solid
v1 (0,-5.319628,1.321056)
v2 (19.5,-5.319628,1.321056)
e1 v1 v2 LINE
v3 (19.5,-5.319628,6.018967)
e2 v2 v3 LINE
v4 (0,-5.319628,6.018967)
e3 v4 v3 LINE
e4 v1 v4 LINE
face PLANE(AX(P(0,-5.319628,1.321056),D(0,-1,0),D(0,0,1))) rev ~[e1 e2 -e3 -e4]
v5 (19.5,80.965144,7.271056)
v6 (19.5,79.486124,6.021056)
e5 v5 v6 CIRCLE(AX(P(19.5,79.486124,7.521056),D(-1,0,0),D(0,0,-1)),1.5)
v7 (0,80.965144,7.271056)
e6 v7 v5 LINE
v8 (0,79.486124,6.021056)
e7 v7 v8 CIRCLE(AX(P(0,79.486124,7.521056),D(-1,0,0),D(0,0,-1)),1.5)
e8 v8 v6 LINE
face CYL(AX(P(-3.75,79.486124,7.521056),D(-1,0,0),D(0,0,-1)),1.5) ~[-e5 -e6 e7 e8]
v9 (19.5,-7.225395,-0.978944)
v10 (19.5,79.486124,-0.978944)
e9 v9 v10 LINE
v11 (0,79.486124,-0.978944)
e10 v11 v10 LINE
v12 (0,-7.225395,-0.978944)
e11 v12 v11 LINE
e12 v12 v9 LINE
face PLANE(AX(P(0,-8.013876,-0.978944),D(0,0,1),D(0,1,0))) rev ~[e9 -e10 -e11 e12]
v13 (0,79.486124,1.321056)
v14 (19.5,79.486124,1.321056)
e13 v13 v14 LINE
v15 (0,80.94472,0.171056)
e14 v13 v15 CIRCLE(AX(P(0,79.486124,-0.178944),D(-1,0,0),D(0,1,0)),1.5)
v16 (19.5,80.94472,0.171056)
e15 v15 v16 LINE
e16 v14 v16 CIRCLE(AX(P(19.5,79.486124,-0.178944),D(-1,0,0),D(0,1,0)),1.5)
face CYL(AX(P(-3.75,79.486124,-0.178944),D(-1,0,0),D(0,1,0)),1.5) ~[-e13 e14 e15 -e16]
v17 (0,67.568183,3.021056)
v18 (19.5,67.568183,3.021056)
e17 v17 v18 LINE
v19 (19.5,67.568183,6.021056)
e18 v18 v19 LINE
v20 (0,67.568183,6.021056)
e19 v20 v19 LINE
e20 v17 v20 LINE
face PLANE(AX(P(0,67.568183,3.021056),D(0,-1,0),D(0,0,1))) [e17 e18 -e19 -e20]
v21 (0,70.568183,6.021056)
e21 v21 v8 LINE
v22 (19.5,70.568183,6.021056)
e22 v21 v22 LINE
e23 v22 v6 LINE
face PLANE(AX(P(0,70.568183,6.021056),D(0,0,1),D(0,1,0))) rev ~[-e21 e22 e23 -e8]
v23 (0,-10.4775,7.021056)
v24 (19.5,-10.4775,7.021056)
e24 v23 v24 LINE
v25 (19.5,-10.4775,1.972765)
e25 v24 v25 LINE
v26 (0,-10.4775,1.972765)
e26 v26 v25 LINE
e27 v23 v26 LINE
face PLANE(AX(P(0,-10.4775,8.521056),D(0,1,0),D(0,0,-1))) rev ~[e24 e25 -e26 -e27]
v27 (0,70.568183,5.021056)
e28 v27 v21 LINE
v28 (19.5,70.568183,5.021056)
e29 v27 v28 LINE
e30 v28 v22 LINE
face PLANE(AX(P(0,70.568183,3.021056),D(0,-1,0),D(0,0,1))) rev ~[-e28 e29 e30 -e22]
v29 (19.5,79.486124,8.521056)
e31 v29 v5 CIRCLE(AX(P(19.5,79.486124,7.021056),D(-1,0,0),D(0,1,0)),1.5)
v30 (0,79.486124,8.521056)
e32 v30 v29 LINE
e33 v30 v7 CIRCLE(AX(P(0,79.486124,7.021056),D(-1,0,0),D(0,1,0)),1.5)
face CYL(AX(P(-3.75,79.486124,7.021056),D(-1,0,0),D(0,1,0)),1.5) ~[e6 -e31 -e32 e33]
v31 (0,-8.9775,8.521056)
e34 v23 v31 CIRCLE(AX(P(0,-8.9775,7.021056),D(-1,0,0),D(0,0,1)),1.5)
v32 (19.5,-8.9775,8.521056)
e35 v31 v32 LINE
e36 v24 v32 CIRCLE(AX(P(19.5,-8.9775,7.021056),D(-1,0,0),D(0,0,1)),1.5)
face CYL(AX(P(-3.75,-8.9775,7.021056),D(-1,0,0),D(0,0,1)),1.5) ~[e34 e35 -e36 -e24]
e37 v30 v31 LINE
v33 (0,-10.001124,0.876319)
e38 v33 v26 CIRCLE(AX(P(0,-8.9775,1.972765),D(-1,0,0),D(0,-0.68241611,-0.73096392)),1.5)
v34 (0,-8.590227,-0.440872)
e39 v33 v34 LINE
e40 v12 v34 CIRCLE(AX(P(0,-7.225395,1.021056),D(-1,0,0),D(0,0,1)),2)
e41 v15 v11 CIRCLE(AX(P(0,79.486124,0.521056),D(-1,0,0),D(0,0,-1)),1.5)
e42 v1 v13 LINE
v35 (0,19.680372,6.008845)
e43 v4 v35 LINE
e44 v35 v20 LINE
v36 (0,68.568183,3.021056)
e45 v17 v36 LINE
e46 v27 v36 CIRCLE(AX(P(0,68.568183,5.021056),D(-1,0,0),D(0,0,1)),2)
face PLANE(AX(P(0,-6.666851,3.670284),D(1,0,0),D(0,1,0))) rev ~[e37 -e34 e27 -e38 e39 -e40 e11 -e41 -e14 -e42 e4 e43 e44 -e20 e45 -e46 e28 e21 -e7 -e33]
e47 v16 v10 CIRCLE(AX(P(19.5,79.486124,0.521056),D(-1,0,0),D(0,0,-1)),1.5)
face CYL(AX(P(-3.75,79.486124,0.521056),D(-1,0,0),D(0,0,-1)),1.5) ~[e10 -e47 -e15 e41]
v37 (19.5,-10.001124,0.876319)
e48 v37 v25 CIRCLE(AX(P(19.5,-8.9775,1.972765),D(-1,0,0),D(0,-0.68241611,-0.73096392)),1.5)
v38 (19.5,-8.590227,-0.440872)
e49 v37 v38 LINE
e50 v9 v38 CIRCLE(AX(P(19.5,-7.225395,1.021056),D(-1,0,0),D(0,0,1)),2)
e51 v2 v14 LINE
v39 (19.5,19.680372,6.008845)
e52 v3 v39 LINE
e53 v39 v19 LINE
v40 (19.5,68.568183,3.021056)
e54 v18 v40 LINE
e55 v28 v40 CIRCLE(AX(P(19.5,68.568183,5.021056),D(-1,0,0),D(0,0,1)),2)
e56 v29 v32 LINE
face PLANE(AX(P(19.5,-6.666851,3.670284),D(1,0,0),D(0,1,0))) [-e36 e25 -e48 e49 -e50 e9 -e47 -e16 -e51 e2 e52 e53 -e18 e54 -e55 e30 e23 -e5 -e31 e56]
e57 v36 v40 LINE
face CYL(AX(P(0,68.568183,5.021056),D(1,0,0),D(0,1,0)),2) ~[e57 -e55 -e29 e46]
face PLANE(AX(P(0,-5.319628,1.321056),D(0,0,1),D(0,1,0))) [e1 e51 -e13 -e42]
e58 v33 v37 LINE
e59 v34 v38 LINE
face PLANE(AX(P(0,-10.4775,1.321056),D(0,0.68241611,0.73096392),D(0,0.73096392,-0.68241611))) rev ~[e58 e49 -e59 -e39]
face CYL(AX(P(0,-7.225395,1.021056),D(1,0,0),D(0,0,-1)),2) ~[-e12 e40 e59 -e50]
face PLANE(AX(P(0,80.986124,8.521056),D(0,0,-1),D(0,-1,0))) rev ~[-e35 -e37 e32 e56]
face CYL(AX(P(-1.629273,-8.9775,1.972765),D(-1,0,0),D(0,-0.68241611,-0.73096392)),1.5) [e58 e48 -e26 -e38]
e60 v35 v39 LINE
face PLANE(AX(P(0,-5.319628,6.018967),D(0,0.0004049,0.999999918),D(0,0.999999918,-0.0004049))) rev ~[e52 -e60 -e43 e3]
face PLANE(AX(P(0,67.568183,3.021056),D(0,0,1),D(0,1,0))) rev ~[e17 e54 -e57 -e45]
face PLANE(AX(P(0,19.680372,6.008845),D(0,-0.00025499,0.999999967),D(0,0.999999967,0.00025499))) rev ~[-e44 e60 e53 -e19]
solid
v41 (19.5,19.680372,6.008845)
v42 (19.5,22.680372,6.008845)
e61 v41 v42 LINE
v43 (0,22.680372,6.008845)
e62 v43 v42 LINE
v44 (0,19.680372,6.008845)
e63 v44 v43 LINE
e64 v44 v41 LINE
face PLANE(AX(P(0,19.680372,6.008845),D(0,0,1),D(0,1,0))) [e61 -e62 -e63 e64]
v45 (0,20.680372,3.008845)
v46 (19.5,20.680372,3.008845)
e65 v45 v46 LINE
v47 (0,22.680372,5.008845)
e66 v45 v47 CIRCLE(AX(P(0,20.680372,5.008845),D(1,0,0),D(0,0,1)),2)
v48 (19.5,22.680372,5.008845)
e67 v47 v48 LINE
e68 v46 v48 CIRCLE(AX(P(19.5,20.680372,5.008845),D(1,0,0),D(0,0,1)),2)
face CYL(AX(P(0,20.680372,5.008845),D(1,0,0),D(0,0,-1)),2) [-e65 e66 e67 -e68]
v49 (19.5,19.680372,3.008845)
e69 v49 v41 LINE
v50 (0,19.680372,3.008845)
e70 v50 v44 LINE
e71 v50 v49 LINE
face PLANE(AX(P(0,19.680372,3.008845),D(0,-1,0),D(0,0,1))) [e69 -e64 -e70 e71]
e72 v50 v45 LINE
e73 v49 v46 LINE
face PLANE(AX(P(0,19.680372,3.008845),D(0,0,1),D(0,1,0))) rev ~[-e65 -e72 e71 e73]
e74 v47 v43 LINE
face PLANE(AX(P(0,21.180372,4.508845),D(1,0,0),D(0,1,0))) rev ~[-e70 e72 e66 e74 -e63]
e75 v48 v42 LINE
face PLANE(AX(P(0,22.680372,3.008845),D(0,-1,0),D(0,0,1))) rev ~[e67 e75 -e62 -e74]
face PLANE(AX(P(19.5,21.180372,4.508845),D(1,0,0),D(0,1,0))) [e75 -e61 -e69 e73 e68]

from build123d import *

# Parameters (mm, degrees)
F0_W        = 2.6942476507
F0_H        = 2.3
F0_W_2      = 86.3057523493
F0_H_2      = 2.5
F0_W_3      = 3
F0_H_3      = 3
F1_DEPTH    = 19.5
F2_T1_DEPTH = 27
F2_T3_DEPTH = 22.7585454732
F3_R        = 2
F3_2_R      = 2


# Not quite as in the source:
# - a fillet or chamfer that OpenCascade refuses, or shapes differently, is made with other operations: its cross-section is extruded or revolved along the edge and cut away or added


with BuildPart() as f1:
    # F0 (on Right) → F1 (new body)
    with BuildSketch(Plane.YZ):
        Polygon((-8.0138755839, 6.0200582189), (-8.0138755839, 1.3210557405), (-5.3196279332, 1.3210557405), (-5.3196279332, 6.0189673179), align=None)
        with Locations((-6.6667517586, 0.1710557405)):
            Rectangle(F0_W, F0_H)
        Polygon((-8.0138755839, -0.9789442595), (-8.0138755839, 1.3210557405), (-8.0138755839, 6.0200582189), (-10.4775000364, 6.0210557405), (-10.4775000364, 1.3210557405), align=None)
        with Locations((37.8332482414, 0.1710557405)):
            Rectangle(F0_W_2, F0_H)
        Polygon((-10.4775000364, 6.0210557405), (-8.0138755839, 6.0200582189), (-8.0138755839, 6.0210557405), align=None)
        Polygon((-8.0138755839, 6.0210557405), (-8.0138755839, 6.0200582189), (-5.3196279332, 6.0189673179), (-5.3196279332, 6.0210557405), align=None)
        Polygon((-5.3196279332, 6.0210557405), (-5.3196279332, 6.0189673179), (19.6803720668, 6.0088448171), (19.6803689531, 6.0210557405), (-2.3196279332, 6.0210557405), align=None)
        Polygon((-10.4775000364, 6.0210557405), (-8.0138755839, 6.0210557405), (-8.0138755839, 8.5210557405), (-10.4775000364, 8.5210557405), (-10.4775000364, 6.8358753532), align=None)
        with Locations((-6.6667517586, 7.2710557405)):
            Rectangle(F0_W, F0_H_2)
        with Locations((-3.8196279332, 7.2710557405)):
            Rectangle(F0_W_3, F0_H_2)
        Polygon((19.6803689531, 6.0210557405), (19.6803720668, 6.0088448171), (67.5681829453, 6.0210557405), align=None)
        Polygon((-2.3196279332, 8.5210557405), (-2.3196279332, 6.0210557405), (19.6803689531, 6.0210557405), (19.6797314776, 8.5210557405), align=None)
        Polygon((19.6803689531, 6.0210557405), (67.5681829453, 6.0210557405), (70.5681829453, 6.0210557405), (80.9861244161, 6.0210557405), (80.9861244161, 8.5210557405), (19.6797314776, 8.5210557405), align=None)
        with Locations((69.0681829453, 4.5210557405)):
            Rectangle(F0_W_3, F0_H_3)
    extrude(amount=F1_DEPTH)

    # F2: fillet of radius 1.5 on 6 edges, made by hand

    # F2_s2 → F2_t1 (cut)
    with BuildSketch(Plane.YZ.offset(-3.75)):
        with BuildLine():
            ThreePointArc((-8.9775000364, 8.5210557405), (-10.0381602081, 8.0817159123), (-10.4775000364, 7.0210557405))
            Line((-10.4775000364, 7.0210557405), (-10.4775000364, 8.5210557405))
            Line((-10.4775000364, 8.5210557405), (-8.9775000364, 8.5210557405))
        make_face()
        with BuildLine():
            ThreePointArc((80.9861244161, 7.0210557405), (80.5467845879, 8.0817159123), (79.4861244161, 8.5210557405))
            Line((79.4861244161, 8.5210557405), (80.9861244161, 8.5210557405))
            Line((80.9861244161, 8.5210557405), (80.9861244161, 7.0210557405))
        make_face()
        with BuildLine():
            ThreePointArc((79.4861244161, 6.0210557405), (80.5467845879, 6.4603955687), (80.9861244161, 7.5210557405))
            Line((80.9861244161, 7.5210557405), (80.9861244161, 6.0210557405))
            Line((80.9861244161, 6.0210557405), (79.4861244161, 6.0210557405))
        make_face()
        with BuildLine():
            ThreePointArc((80.9861244161, -0.1789442595), (80.5467845879, 0.8817159123), (79.4861244161, 1.3210557405))
            Line((79.4861244161, 1.3210557405), (80.9861244161, 1.3210557405))
            Line((80.9861244161, 1.3210557405), (80.9861244161, -0.1789442595))
        make_face()
        with BuildLine():
            ThreePointArc((79.4861244161, -0.9789442595), (80.5467845879, -0.5396044313), (80.9861244161, 0.5210557405))
            Line((80.9861244161, 0.5210557405), (80.9861244161, -0.9789442595))
            Line((80.9861244161, -0.9789442595), (79.4861244161, -0.9789442595))
        make_face()
    extrude(amount=F2_T1_DEPTH, mode=Mode.SUBTRACT)

    # F2_s4 → F2_t3 (cut)
    with BuildSketch(Plane.YZ.offset(-1.6292727366)):
        with BuildLine():
            ThreePointArc((-10.0011242018, 0.8763189551), (-10.3532609618, 1.3750342303), (-10.4775000364, 1.9727648351))
            Line((-10.4775000364, 1.9727648351), (-10.4775000364, 1.3210557405))
            Line((-10.4775000364, 1.3210557405), (-10.0011242018, 0.8763189551))
        make_face()
    extrude(amount=F2_T3_DEPTH, mode=Mode.SUBTRACT)

    # F3
    f3_edges = [f1.edges().sort_by_distance(p)[0] for p in [
        (9.75, -8.013876, -0.978944),
        (9.75, 70.568183, 3.021056),
    ]]
    fillet(f3_edges, radius=F3_R)


with BuildPart() as f1b:
    # F0 (on Right) → F1, piece 2 (new body)
    with BuildSketch(Plane.YZ):
        with Locations((21.1803720668, 4.5088448171)):
            Rectangle(F0_W_3, F0_H_3)
    extrude(amount=F1_DEPTH)

    # F3#2
    f3_2_edges = [f1b.edges().sort_by_distance(p)[0] for p in [
        (9.75, 22.680372, 3.008845),
    ]]
    fillet(f3_2_edges, radius=F3_2_R)


solid = Compound([f1.part, f1b.part])
